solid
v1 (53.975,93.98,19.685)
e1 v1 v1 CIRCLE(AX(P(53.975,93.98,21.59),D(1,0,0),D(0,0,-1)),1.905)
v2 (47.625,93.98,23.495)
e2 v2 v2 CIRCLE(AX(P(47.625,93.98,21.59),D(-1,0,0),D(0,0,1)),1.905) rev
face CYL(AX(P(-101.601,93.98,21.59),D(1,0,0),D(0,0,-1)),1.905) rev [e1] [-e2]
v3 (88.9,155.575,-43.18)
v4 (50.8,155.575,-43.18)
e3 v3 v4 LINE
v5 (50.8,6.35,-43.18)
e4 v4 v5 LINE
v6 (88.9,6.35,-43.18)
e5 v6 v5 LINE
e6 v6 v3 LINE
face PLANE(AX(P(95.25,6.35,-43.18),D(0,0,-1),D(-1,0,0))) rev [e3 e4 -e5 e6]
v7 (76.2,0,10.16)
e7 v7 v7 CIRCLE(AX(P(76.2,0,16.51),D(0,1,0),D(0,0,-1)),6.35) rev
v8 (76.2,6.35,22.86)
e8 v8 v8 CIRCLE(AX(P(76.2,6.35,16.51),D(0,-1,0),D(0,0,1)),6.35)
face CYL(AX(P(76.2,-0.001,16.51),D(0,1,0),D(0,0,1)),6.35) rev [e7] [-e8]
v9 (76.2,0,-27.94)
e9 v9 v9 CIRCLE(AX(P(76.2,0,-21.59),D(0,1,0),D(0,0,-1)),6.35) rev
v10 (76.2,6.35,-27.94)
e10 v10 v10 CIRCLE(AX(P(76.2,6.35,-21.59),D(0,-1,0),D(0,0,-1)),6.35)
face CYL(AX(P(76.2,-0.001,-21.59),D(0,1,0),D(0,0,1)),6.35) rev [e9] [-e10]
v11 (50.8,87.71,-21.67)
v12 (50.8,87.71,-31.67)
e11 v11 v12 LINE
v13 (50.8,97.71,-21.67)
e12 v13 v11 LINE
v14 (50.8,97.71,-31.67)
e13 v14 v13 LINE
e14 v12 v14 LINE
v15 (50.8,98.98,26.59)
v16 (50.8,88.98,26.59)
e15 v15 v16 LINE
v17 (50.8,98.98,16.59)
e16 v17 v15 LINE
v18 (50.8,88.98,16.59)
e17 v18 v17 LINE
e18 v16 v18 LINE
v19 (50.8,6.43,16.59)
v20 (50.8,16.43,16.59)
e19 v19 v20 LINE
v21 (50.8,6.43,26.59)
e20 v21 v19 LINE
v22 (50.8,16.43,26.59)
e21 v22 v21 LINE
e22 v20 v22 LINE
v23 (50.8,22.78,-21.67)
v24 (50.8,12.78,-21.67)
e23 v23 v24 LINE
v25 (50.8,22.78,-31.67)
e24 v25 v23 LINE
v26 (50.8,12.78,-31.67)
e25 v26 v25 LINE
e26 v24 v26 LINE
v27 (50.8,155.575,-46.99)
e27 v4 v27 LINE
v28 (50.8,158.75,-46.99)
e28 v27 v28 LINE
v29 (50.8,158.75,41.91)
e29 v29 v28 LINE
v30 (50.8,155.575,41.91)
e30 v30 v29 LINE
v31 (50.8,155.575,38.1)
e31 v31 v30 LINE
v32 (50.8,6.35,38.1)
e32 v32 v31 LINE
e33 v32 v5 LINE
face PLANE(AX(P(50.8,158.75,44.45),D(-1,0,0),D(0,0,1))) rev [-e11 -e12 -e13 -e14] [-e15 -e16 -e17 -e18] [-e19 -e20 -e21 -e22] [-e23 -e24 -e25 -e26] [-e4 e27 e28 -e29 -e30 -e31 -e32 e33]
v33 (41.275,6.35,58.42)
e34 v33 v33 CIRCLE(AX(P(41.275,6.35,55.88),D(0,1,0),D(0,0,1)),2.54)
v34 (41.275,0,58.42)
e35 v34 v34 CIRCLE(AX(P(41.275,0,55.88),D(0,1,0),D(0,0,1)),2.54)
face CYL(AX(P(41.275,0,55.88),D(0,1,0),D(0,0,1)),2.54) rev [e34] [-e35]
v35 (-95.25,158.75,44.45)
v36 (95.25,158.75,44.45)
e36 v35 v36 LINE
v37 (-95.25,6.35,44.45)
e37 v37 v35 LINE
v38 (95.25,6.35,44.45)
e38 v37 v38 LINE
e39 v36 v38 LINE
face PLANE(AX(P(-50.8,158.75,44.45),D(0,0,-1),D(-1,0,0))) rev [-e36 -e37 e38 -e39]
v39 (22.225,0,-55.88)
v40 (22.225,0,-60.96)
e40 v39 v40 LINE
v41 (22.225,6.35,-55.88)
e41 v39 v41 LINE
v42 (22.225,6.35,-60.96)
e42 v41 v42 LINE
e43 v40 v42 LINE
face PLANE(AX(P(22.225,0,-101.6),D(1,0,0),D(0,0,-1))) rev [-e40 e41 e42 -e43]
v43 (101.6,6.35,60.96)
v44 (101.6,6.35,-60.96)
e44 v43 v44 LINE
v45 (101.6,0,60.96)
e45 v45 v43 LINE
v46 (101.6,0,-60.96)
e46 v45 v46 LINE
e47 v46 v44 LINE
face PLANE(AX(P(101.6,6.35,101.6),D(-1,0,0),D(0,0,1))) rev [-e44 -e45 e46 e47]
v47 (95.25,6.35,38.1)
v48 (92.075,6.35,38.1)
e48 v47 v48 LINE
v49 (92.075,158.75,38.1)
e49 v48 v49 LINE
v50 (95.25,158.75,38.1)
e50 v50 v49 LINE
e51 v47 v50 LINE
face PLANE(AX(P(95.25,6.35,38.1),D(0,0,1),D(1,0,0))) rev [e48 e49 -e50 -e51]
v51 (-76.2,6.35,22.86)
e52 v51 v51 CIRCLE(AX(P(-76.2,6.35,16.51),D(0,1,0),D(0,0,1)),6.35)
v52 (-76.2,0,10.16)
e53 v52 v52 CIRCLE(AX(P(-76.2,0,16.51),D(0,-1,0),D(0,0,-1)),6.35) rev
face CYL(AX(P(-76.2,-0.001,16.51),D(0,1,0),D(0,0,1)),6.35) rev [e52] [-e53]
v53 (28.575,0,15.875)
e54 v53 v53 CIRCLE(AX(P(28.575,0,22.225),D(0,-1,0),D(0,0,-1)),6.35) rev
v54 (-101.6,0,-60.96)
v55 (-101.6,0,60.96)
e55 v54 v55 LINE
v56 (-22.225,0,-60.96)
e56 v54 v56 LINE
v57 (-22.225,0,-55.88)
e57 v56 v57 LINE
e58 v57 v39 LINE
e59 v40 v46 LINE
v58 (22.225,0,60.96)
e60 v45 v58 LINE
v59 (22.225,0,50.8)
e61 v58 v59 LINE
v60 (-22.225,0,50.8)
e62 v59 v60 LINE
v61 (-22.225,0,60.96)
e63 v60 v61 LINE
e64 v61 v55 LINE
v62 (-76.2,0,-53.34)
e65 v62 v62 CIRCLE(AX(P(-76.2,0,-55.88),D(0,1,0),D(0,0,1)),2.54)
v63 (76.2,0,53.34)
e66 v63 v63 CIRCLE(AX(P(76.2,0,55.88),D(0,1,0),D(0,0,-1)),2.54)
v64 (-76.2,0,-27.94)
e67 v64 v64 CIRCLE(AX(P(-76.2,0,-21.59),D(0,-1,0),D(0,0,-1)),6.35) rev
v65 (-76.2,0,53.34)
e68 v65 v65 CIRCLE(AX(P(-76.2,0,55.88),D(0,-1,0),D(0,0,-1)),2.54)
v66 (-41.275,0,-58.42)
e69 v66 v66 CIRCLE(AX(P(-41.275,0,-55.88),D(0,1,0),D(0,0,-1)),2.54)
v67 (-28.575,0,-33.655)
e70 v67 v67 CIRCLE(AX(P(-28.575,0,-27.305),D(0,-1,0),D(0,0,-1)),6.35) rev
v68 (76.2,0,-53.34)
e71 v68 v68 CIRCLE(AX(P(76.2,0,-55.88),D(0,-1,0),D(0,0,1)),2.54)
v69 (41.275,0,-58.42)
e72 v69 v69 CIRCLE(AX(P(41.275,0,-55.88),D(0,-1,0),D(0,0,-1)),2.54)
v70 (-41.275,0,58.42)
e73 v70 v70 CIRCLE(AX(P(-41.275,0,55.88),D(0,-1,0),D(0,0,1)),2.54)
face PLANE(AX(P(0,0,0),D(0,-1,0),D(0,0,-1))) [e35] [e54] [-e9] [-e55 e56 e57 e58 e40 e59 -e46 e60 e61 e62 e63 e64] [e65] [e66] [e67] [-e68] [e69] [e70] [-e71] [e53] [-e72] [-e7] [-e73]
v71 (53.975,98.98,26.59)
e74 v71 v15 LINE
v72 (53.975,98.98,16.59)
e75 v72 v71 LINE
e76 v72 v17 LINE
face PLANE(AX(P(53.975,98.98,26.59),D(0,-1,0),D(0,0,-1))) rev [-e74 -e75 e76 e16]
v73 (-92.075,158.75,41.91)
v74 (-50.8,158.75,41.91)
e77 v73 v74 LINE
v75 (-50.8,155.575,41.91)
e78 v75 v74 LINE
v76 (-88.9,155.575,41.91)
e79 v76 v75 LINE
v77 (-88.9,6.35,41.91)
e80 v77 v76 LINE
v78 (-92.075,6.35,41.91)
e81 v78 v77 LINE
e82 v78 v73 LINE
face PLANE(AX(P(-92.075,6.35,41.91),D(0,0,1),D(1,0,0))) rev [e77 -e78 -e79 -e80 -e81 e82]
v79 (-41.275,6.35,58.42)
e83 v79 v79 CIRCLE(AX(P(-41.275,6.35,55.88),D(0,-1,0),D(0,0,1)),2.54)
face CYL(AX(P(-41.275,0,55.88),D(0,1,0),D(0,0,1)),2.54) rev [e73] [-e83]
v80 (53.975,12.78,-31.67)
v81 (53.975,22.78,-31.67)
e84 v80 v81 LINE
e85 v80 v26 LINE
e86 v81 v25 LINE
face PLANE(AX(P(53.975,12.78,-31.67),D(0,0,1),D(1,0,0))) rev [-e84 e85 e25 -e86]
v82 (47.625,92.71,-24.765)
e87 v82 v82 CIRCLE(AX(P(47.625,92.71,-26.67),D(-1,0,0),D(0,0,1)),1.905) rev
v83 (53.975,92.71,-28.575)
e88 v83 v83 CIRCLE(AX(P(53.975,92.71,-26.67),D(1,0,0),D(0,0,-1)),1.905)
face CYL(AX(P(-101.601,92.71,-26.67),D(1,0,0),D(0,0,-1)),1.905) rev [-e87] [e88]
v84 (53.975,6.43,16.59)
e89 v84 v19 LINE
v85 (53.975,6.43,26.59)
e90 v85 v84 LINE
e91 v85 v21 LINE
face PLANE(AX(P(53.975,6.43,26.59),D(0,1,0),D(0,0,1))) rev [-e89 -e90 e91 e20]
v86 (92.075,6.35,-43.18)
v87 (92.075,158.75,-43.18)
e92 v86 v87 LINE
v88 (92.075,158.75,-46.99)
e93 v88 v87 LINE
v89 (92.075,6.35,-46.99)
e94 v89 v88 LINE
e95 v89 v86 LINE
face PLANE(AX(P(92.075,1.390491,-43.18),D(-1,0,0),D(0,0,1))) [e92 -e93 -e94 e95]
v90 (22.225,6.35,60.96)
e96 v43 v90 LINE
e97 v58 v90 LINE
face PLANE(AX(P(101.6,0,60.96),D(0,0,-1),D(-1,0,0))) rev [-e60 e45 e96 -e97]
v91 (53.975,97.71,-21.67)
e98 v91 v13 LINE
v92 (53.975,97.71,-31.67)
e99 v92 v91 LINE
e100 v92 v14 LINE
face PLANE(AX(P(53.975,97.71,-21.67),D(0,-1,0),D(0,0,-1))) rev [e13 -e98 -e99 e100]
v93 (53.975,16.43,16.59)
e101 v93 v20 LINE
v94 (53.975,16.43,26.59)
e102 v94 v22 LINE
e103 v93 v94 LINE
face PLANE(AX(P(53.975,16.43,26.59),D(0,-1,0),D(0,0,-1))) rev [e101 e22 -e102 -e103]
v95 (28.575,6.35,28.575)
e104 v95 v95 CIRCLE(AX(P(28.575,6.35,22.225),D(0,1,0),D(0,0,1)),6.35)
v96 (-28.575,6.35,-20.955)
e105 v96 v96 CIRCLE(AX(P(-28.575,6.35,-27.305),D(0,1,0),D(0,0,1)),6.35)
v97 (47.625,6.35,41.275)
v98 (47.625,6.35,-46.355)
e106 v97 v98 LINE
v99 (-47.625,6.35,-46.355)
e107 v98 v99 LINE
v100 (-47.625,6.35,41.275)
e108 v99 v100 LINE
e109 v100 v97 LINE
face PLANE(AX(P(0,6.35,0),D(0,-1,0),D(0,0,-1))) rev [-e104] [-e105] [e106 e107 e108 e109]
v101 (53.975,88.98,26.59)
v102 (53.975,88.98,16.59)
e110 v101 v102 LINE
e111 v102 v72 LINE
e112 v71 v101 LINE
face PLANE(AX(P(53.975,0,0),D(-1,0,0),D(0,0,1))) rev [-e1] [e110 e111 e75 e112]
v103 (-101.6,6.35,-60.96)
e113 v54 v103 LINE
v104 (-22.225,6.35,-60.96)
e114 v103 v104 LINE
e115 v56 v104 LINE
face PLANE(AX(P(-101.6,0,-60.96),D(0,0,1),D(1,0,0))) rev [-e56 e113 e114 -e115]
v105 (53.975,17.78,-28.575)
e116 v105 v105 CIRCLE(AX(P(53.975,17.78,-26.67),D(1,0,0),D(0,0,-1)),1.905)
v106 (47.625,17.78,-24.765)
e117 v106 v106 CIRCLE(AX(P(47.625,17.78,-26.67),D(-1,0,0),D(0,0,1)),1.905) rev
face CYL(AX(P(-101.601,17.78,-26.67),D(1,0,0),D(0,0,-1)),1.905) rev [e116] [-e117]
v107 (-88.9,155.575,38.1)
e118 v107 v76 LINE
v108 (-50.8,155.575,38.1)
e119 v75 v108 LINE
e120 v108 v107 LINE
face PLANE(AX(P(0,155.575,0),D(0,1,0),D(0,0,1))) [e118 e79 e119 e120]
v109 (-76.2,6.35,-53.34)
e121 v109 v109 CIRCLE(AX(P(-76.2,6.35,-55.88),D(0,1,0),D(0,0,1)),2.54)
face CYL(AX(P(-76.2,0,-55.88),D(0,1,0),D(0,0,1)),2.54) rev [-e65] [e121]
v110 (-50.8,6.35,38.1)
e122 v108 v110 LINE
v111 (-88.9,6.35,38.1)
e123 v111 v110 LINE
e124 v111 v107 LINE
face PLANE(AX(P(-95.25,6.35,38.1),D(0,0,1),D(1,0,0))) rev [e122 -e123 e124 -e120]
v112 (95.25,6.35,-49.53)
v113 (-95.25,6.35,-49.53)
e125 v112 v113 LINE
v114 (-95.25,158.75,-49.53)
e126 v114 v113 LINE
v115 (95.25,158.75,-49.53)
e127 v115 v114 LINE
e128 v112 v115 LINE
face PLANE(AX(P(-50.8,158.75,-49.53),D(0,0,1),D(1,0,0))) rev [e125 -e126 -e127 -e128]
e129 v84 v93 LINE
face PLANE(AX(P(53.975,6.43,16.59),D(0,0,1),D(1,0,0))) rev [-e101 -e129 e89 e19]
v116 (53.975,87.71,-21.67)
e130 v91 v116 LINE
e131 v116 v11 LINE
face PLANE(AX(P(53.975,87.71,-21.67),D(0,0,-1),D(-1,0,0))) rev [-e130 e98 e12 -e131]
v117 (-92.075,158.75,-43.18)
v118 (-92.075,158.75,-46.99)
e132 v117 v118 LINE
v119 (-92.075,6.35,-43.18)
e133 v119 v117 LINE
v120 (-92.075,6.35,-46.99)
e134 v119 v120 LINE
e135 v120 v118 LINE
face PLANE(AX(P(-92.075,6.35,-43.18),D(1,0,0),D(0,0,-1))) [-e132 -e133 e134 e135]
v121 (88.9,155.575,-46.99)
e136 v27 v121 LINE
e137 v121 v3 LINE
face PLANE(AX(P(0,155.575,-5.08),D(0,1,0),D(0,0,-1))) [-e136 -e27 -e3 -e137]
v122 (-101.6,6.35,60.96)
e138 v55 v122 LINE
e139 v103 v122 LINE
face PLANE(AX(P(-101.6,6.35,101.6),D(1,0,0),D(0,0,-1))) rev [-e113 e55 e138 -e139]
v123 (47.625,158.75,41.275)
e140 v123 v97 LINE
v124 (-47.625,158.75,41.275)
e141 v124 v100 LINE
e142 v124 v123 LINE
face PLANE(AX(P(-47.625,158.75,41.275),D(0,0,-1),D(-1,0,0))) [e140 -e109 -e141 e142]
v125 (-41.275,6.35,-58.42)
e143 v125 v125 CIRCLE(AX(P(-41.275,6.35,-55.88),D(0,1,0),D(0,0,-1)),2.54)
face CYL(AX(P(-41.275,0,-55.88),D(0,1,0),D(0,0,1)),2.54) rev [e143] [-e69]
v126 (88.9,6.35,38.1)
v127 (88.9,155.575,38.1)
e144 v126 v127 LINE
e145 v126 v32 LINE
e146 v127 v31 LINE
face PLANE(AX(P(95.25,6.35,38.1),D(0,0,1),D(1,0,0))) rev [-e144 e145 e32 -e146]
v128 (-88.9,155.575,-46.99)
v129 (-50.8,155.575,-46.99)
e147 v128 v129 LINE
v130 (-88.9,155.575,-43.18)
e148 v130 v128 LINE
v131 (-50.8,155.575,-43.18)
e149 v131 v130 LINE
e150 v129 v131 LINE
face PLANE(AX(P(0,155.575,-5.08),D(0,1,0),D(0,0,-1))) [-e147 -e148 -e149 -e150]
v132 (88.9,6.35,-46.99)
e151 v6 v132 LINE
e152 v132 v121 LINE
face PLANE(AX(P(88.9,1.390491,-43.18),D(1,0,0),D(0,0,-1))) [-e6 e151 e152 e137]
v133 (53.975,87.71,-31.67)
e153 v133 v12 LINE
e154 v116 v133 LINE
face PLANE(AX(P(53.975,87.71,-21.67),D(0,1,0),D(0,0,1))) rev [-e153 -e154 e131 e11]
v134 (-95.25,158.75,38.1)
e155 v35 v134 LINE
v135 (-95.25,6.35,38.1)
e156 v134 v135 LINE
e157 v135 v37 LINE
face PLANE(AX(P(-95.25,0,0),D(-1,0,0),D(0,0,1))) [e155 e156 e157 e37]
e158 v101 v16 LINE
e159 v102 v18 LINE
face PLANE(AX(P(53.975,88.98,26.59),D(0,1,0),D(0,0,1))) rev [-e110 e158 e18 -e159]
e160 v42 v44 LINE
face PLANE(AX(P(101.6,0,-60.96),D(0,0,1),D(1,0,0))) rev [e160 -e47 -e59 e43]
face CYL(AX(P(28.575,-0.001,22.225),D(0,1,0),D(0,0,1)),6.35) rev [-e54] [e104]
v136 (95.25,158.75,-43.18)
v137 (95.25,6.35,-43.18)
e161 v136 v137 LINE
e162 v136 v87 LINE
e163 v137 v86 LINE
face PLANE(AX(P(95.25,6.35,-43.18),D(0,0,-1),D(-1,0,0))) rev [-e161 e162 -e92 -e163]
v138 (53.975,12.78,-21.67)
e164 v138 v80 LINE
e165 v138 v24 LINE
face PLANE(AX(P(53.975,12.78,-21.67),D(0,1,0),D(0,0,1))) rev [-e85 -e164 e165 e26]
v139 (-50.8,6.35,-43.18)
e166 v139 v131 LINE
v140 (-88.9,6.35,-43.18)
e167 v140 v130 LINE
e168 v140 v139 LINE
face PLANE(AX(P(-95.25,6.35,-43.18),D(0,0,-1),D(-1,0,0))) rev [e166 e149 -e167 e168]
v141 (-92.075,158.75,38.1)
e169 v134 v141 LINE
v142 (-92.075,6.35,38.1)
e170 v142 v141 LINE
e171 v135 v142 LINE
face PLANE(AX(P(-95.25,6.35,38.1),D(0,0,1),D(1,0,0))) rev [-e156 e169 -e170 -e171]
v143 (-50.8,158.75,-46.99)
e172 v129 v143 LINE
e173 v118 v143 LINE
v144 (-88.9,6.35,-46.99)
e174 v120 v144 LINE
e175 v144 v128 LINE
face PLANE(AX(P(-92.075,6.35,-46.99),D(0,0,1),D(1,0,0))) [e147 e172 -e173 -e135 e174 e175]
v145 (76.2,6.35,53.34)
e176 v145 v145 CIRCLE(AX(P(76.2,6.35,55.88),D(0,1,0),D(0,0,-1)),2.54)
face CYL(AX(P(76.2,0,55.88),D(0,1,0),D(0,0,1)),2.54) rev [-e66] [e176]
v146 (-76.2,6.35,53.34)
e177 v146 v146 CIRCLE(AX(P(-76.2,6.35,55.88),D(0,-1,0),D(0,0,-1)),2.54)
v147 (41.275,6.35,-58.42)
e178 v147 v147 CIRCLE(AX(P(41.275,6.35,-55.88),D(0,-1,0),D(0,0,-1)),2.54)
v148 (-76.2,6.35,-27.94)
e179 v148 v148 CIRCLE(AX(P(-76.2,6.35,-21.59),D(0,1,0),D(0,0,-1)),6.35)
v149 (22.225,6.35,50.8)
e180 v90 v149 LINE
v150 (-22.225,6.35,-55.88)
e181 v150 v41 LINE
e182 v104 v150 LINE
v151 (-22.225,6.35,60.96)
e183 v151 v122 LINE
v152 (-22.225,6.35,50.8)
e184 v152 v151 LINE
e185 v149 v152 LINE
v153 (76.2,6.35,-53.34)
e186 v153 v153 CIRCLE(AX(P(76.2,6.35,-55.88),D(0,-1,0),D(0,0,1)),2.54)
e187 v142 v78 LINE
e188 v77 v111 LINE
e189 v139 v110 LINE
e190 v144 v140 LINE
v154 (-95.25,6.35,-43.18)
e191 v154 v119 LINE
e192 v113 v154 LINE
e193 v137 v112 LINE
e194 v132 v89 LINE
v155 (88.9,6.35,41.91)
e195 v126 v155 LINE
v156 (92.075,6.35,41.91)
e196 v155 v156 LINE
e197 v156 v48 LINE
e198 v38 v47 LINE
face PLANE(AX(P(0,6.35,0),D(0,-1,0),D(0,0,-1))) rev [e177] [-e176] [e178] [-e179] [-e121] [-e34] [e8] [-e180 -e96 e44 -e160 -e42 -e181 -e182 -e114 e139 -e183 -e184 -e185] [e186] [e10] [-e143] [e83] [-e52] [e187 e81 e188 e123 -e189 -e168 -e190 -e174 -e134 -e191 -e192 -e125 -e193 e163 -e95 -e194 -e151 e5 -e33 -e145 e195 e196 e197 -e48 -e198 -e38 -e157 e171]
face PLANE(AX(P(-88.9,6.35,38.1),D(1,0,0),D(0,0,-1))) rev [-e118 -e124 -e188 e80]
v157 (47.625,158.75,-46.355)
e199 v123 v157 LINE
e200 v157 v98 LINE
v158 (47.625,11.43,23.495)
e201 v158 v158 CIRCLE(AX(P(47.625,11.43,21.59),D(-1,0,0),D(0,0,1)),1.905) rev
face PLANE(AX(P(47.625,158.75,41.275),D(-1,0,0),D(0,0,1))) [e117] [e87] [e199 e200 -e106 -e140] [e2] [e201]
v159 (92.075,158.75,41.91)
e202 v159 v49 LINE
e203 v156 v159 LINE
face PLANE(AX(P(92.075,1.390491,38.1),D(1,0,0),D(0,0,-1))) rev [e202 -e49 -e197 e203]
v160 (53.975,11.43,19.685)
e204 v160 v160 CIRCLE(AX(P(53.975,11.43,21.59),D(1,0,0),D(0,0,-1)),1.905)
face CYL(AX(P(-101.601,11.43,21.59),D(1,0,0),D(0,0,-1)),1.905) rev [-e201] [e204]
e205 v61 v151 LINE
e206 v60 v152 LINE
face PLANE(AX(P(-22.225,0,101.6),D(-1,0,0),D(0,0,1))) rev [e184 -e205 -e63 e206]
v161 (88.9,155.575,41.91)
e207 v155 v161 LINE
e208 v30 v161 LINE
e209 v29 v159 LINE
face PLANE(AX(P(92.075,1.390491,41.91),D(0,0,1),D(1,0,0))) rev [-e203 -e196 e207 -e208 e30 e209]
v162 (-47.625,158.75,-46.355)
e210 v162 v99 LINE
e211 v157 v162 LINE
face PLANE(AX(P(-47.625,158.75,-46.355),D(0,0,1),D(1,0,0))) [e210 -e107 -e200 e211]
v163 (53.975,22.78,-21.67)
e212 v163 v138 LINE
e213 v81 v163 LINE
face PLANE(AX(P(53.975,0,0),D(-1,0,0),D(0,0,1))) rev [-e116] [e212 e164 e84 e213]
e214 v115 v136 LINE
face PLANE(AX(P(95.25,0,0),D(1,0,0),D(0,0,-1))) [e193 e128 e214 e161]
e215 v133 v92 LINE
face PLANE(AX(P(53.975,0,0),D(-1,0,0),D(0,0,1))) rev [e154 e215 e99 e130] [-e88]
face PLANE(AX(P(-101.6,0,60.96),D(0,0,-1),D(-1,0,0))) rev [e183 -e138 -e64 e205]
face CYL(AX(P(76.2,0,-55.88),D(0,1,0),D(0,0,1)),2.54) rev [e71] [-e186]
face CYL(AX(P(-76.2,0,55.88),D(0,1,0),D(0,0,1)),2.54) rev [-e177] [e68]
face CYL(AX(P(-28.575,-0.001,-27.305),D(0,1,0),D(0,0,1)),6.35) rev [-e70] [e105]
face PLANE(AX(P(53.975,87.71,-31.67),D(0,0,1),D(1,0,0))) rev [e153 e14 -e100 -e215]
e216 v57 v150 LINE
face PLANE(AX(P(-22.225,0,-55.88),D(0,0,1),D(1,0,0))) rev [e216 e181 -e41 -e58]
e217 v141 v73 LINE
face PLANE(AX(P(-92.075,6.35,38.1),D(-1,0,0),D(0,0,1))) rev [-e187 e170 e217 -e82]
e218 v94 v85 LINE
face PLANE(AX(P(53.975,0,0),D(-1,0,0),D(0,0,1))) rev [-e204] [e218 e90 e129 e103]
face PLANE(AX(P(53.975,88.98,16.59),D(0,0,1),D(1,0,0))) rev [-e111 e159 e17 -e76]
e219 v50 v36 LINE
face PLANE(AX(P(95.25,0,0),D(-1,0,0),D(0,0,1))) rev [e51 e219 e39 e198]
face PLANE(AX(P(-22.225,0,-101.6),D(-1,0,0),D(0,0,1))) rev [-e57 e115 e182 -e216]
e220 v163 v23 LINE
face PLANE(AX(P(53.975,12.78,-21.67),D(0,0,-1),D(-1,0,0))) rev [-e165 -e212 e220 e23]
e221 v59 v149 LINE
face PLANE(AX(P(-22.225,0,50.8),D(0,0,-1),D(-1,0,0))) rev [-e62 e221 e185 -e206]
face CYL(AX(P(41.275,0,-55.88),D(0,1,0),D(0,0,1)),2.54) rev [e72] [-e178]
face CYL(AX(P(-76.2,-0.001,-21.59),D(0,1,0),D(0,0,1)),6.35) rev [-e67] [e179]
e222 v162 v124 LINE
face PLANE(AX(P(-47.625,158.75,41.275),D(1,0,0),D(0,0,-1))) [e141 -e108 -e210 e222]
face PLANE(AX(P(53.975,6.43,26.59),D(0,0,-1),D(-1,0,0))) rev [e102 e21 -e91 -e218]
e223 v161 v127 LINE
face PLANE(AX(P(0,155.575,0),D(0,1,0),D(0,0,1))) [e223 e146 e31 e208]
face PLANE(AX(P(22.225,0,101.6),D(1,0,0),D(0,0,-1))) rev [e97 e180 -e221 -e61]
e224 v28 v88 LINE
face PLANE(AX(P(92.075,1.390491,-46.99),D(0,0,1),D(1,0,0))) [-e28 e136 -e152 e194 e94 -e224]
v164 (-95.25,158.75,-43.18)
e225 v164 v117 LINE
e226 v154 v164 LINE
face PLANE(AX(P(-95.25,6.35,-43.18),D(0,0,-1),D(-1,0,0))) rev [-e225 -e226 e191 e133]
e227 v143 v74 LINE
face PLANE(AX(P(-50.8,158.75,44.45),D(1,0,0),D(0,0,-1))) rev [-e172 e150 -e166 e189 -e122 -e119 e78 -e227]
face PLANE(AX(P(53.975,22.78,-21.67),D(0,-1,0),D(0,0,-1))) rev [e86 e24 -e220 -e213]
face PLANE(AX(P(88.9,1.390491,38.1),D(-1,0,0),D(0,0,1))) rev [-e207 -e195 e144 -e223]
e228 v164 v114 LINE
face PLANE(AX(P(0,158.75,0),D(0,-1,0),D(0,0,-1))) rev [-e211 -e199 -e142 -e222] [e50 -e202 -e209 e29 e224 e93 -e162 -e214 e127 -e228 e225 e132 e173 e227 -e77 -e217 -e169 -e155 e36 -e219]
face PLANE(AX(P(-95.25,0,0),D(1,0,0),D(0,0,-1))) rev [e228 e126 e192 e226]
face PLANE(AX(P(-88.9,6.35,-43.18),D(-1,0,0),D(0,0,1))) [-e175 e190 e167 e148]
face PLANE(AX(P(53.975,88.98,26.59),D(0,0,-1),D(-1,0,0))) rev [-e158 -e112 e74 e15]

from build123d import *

# Parameters (mm, degrees)
SKETCH1_W               = 203.2
SKETCH1_H               = 203.2
BOSS_EXTRUDE1_DEPTH     = 6.35
SKETCH2_W               = 44.45
SKETCH2_H               = 45.72
SKETCH2_H_2             = 50.8
CUT_EXTRUDE1_DEPTH      = 144.824345992
SKETCH3_R               = 2.54
SKETCH3_W               = 25.4
SKETCH3_H               = 25.4
CUT_EXTRUDE2_DEPTH      = 6.35
MIRROR2_COPY_1_SKETCH_R = 2.54
MIRROR2_COPY_1_SKETCH_W = 25.4
MIRROR2_COPY_1_SKETCH_H = 25.4
MIRROR2_COPY_1_DEPTH    = 6.35
SKETCH4_W               = 101.6
SKETCH4_H               = 93.98
SKETCH4_W_2             = 95.25
SKETCH4_H_2             = 87.63
BOSS_EXTRUDE2_DEPTH     = 152.4
SKETCH5_W               = 10
SKETCH5_H               = 10
SKETCH5_R               = 1.6
BOSS_EXTRUDE3_DEPTH     = 3.175
CUT_EXTRUDE3_REACH      = 246.393
SKETCH8_R               = 1.905
SKETCH9_W               = 6.35
SKETCH9_H               = 152.4
BOSS_EXTRUDE4_DEPTH     = 44.45
SKETCH12_W              = 3.175
SKETCH12_H              = 3.81
CUT_EXTRUDE4_DEPTH      = 152.4
SKETCH13_W              = 38.1
SKETCH13_H              = 3.81
CUT_EXTRUDE5_DEPTH      = 3.175
SKETCH14_W              = 6.35
SKETCH14_H              = 152.4
BOSS_EXTRUDE5_DEPTH     = 44.45
SKETCH15_W              = 3.175
SKETCH15_H              = 3.81
CUT_EXTRUDE6_DEPTH      = 152.4
SKETCH16_W              = 38.1
SKETCH16_H              = 3.81
CUT_EXTRUDE7_DEPTH      = 3.175
CUT_EXTRUDE8_REACH      = 211.454
SKETCH17_R              = 6.35
MIRROR5_OUTLINE_R       = 6.35
MIRROR5_DEPTH           = 6.35
SKETCH18_W              = 79.375
SKETCH18_H              = 40.64
CUT_EXTRUDE9_DEPTH      = 210.453765781


# Read off the part's stored shape, not the designer's step: Mirror5
with BuildPart() as part:
    # Sketch1 → Boss-Extrude1 (new body)
    with BuildSketch(Plane(origin=(0, 0, 0), x_dir=(1, 0, 0), z_dir=(0, 1, 0))):
        Rectangle(SKETCH1_W, SKETCH1_H)
    extrude(amount=BOSS_EXTRUDE1_DEPTH)

    # Sketch2 → Cut-Extrude1 (cut, through all)
    with BuildSketch(Plane(origin=(0, 6.35, 0), x_dir=(1, 0, 0), z_dir=(0, 1, 0))):
        with Locations((0, 78.74)):
            Rectangle(SKETCH2_W, SKETCH2_H)
        with Locations((0, -76.2)):
            Rectangle(SKETCH2_W, SKETCH2_H_2)
    extrude(amount=-CUT_EXTRUDE1_DEPTH, mode=Mode.SUBTRACT)

    # Sketch3 → Cut-Extrude2 (cut)
    with BuildSketch(Plane(origin=(0, 6.35, 0), x_dir=(1, 0, 0), z_dir=(0, 1, 0))):
        with Locations(Location((-96.52, 76.2, 0), (0, 0, 270))):
            Circle(SKETCH3_R)
        with Locations(Location((-76.2, 96.52, 0), (0, 0, 270))):
            Circle(SKETCH3_R)
        with Locations(Location((-76.2, 55.88, 0), (0, 0, 270))):
            Circle(SKETCH3_R)
        with Locations(Location((-41.275, 96.52, 0), (0, 0, 270))):
            Circle(SKETCH3_R)
        with Locations(Location((-41.275, 55.88, 0), (0, 0, 90))):
            Circle(SKETCH3_R)
        with Locations((-41.148, 76.2)):
            Rectangle(SKETCH3_W, SKETCH3_H)
        with Locations((-76.2, 76.2)):
            Rectangle(SKETCH3_W, SKETCH3_H)
    cut_extrude2 = extrude(amount=-CUT_EXTRUDE2_DEPTH, mode=Mode.SUBTRACT)

    # Mirror1: Cut-Extrude2 across plane
    add(cut_extrude2.mirror(Plane(origin=(0, 0, 0), x_dir=(0, 0, 1), z_dir=(1, 0, 0))), mode=Mode.SUBTRACT)

    # Mirror2: Cut-Extrude2 across plane
    add(cut_extrude2.mirror(Plane.XY), mode=Mode.SUBTRACT)

    # Mirror2 copy 1 sketch → Mirror2 copy 1 (cut)
    with BuildSketch(Plane(origin=(0, 6.35, 0), x_dir=(-1, 0, 0), z_dir=(0, 1, 0))):
        with Locations(Location((-96.52, 76.2, 0), (0, 0, 270))):
            Circle(MIRROR2_COPY_1_SKETCH_R)
        with Locations(Location((-76.2, 96.52, 0), (0, 0, 270))):
            Circle(MIRROR2_COPY_1_SKETCH_R)
        with Locations(Location((-76.2, 55.88, 0), (0, 0, 270))):
            Circle(MIRROR2_COPY_1_SKETCH_R)
        with Locations(Location((-41.275, 96.52, 0), (0, 0, 270))):
            Circle(MIRROR2_COPY_1_SKETCH_R)
        with Locations(Location((-41.275, 55.88, 0), (0, 0, 90))):
            Circle(MIRROR2_COPY_1_SKETCH_R)
        with Locations((-41.148, 76.2)):
            Rectangle(MIRROR2_COPY_1_SKETCH_W, MIRROR2_COPY_1_SKETCH_H)
        with Locations((-76.2, 76.2)):
            Rectangle(MIRROR2_COPY_1_SKETCH_W, MIRROR2_COPY_1_SKETCH_H)
    extrude(amount=-MIRROR2_COPY_1_DEPTH, mode=Mode.SUBTRACT)

    # Sketch4 → Boss-Extrude2 (add)
    with BuildSketch(Plane(origin=(0, 6.35, 0), x_dir=(1, 0, 0), z_dir=(0, 1, 0))):
        with Locations((0, 2.54)):
            Rectangle(SKETCH4_W, SKETCH4_H)
        with Locations((0, 2.54)):
            Rectangle(SKETCH4_W_2, SKETCH4_H_2, mode=Mode.SUBTRACT)
    extrude(amount=BOSS_EXTRUDE2_DEPTH)

    # Sketch5 → Boss-Extrude3 (add)
    # profile 1 of 4: a face of its own
    with BuildSketch(Plane(origin=(50.8, 0, 0), x_dir=(0, 0, -1), z_dir=(1, 0, 0))):
        with Locations((-21.59, 93.98)):
            Rectangle(SKETCH5_W, SKETCH5_H)
        with Locations((-21.59, 93.98)):
            Circle(SKETCH5_R, mode=Mode.SUBTRACT)
    # profile 2 of 4: a face of its own
    with BuildSketch(Plane(origin=(50.8, 0, 0), x_dir=(0, 0, -1), z_dir=(1, 0, 0))):
        with Locations((26.67, 92.71)):
            Rectangle(SKETCH5_W, SKETCH5_H)
        with Locations((26.67, 92.71)):
            Circle(SKETCH5_R, mode=Mode.SUBTRACT)
    # profile 3 of 4: a face of its own
    with BuildSketch(Plane(origin=(50.8, 0, 0), x_dir=(0, 0, -1), z_dir=(1, 0, 0))):
        with Locations((-21.59, 11.43)):
            Rectangle(SKETCH5_W, SKETCH5_H)
        with Locations((-21.59, 11.43)):
            Circle(SKETCH5_R, mode=Mode.SUBTRACT)
    # profile 4 of 4: a face of its own
    with BuildSketch(Plane(origin=(50.8, 0, 0), x_dir=(0, 0, -1), z_dir=(1, 0, 0))):
        with Locations((26.67, 17.78)):
            Rectangle(SKETCH5_W, SKETCH5_H)
        with Locations((26.67, 17.78)):
            Circle(SKETCH5_R, mode=Mode.SUBTRACT)
    extrude(amount=BOSS_EXTRUDE3_DEPTH)

    # Sketch8 → Cut-Extrude3 (cut, up to next)
    with BuildSketch(Plane(origin=(53.975, 0, 0), x_dir=(0, 0, -1), z_dir=(1, 0, 0)), mode=Mode.PRIVATE) as cut_extrude3_sk1:
        with Locations((-21.59, 93.98)):
            Circle(SKETCH8_R)
    cut_extrude3_tool1 = extrude(cut_extrude3_sk1.sketch, amount=-CUT_EXTRUDE3_REACH, mode=Mode.PRIVATE) & part.part
    # Sketch8 → Cut-Extrude3 (cut, up to next)
    with BuildSketch(Plane(origin=(53.975, 0, 0), x_dir=(0, 0, -1), z_dir=(1, 0, 0)), mode=Mode.PRIVATE) as cut_extrude3_sk2:
        with Locations((26.67, 92.71)):
            Circle(SKETCH8_R)
    cut_extrude3_tool2 = extrude(cut_extrude3_sk2.sketch, amount=-CUT_EXTRUDE3_REACH, mode=Mode.PRIVATE) & part.part
    # Sketch8 → Cut-Extrude3 (cut, up to next)
    with BuildSketch(Plane(origin=(53.975, 0, 0), x_dir=(0, 0, -1), z_dir=(1, 0, 0)), mode=Mode.PRIVATE) as cut_extrude3_sk3:
        with Locations((-21.59, 11.43)):
            Circle(SKETCH8_R)
    cut_extrude3_tool3 = extrude(cut_extrude3_sk3.sketch, amount=-CUT_EXTRUDE3_REACH, mode=Mode.PRIVATE) & part.part
    # Sketch8 → Cut-Extrude3 (cut, up to next)
    with BuildSketch(Plane(origin=(53.975, 0, 0), x_dir=(0, 0, -1), z_dir=(1, 0, 0)), mode=Mode.PRIVATE) as cut_extrude3_sk4:
        with Locations((26.67, 17.78)):
            Circle(SKETCH8_R)
    cut_extrude3_tool4 = extrude(cut_extrude3_sk4.sketch, amount=-CUT_EXTRUDE3_REACH, mode=Mode.PRIVATE) & part.part
    add(cut_extrude3_tool1.solids().sort_by_distance((53.975, 93.98, 21.59))[0], mode=Mode.SUBTRACT)
    add(cut_extrude3_tool2.solids().sort_by_distance((53.975, 92.71, -26.67))[0], mode=Mode.SUBTRACT)
    add(cut_extrude3_tool3.solids().sort_by_distance((53.975, 11.43, 21.59))[0], mode=Mode.SUBTRACT)
    add(cut_extrude3_tool4.solids().sort_by_distance((53.975, 17.78, -26.67))[0], mode=Mode.SUBTRACT)

    # Sketch9 → Boss-Extrude4 (add)
    with BuildSketch(Plane(origin=(50.8, 0, 0), x_dir=(0, 0, -1), z_dir=(1, 0, 0))):
        with Locations((-41.275, 82.55)):
            Rectangle(SKETCH9_W, SKETCH9_H)
        with Locations((46.355, 82.55)):
            Rectangle(SKETCH9_W, SKETCH9_H)
    extrude(amount=BOSS_EXTRUDE4_DEPTH)

    # Sketch12 → Cut-Extrude4 (cut)
    with BuildSketch(Plane(origin=(0, 158.75, 0), x_dir=(1, 0, 0), z_dir=(0, 1, 0))):
        with Locations((90.4875, -40.005)):
            Rectangle(SKETCH12_W, SKETCH12_H)
    cut_extrude4 = extrude(amount=-CUT_EXTRUDE4_DEPTH, mode=Mode.SUBTRACT)

    # Sketch13 → Cut-Extrude5 (cut)
    with BuildSketch(Plane(origin=(0, 158.75, 0), x_dir=(1, 0, 0), z_dir=(0, 1, 0))):
        with Locations((69.85, -40.005)):
            Rectangle(SKETCH13_W, SKETCH13_H)
    cut_extrude5 = extrude(amount=-CUT_EXTRUDE5_DEPTH, mode=Mode.SUBTRACT)

    # Mirror3: Cut-Extrude4, Cut-Extrude5 across plane
    add(cut_extrude4.mirror(Plane(origin=(0, 0, -2.54), x_dir=(1, 0, 0), z_dir=(0, 0, -1))), mode=Mode.SUBTRACT)
    add(cut_extrude5.mirror(Plane(origin=(0, 0, -2.54), x_dir=(1, 0, 0), z_dir=(0, 0, -1))), mode=Mode.SUBTRACT)

    # Sketch14 → Boss-Extrude5 (add)
    with BuildSketch(Plane.ZY.offset(50.8)):
        with Locations((-46.355, 82.55)):
            Rectangle(SKETCH14_W, SKETCH14_H)
        with Locations((41.275, 82.55)):
            Rectangle(SKETCH14_W, SKETCH14_H)
    extrude(amount=BOSS_EXTRUDE5_DEPTH)

    # Sketch15 → Cut-Extrude6 (cut)
    with BuildSketch(Plane(origin=(0, 158.75, 0), x_dir=(1, 0, 0), z_dir=(0, 1, 0))):
        with Locations((-90.4875, -40.005)):
            Rectangle(SKETCH15_W, SKETCH15_H)
    cut_extrude6 = extrude(amount=-CUT_EXTRUDE6_DEPTH, mode=Mode.SUBTRACT)

    # Sketch16 → Cut-Extrude7 (cut)
    with BuildSketch(Plane(origin=(0, 158.75, 0), x_dir=(1, 0, 0), z_dir=(0, 1, 0))):
        with Locations((-69.85, -40.005)):
            Rectangle(SKETCH16_W, SKETCH16_H)
    cut_extrude7 = extrude(amount=-CUT_EXTRUDE7_DEPTH, mode=Mode.SUBTRACT)

    # Mirror4: Cut-Extrude6, Cut-Extrude7 across plane
    add(cut_extrude6.mirror(Plane(origin=(0, 0, -2.54), x_dir=(1, 0, 0), z_dir=(0, 0, -1))), mode=Mode.SUBTRACT)
    add(cut_extrude7.mirror(Plane(origin=(0, 0, -2.54), x_dir=(1, 0, 0), z_dir=(0, 0, -1))), mode=Mode.SUBTRACT)

    # Sketch17 → Cut-Extrude8 (cut, up to next)
    with BuildSketch(Plane(origin=(0, 6.35, 0), x_dir=(1, 0, 0), z_dir=(0, 1, 0)), mode=Mode.PRIVATE) as cut_extrude8_sk1:
        with Locations(Location((-76.2, -16.51, 0), (0, 0, 270))):
            Circle(SKETCH17_R)
    cut_extrude8_tool1 = extrude(cut_extrude8_sk1.sketch, amount=-CUT_EXTRUDE8_REACH, mode=Mode.PRIVATE) & part.part
    # Sketch17 → Cut-Extrude8 (cut, up to next)
    with BuildSketch(Plane(origin=(0, 6.35, 0), x_dir=(1, 0, 0), z_dir=(0, 1, 0)), mode=Mode.PRIVATE) as cut_extrude8_sk2:
        with Locations(Location((-76.2, 21.59, 0), (0, 0, 90))):
            Circle(SKETCH17_R)
    cut_extrude8_tool2 = extrude(cut_extrude8_sk2.sketch, amount=-CUT_EXTRUDE8_REACH, mode=Mode.PRIVATE) & part.part
    # Sketch17 → Cut-Extrude8 (cut, up to next)
    with BuildSketch(Plane(origin=(0, 6.35, 0), x_dir=(1, 0, 0), z_dir=(0, 1, 0)), mode=Mode.PRIVATE) as cut_extrude8_sk3:
        with Locations(Location((-28.575, 27.305, 0), (0, 0, 270))):
            Circle(SKETCH17_R)
    cut_extrude8_tool3 = extrude(cut_extrude8_sk3.sketch, amount=-CUT_EXTRUDE8_REACH, mode=Mode.PRIVATE) & part.part
    # Sketch17 → Cut-Extrude8 (cut, up to next)
    with BuildSketch(Plane(origin=(0, 6.35, 0), x_dir=(1, 0, 0), z_dir=(0, 1, 0)), mode=Mode.PRIVATE) as cut_extrude8_sk4:
        with Locations(Location((28.575, -22.225, 0), (0, 0, 270))):
            Circle(SKETCH17_R)
    cut_extrude8_tool4 = extrude(cut_extrude8_sk4.sketch, amount=-CUT_EXTRUDE8_REACH, mode=Mode.PRIVATE) & part.part
    add(cut_extrude8_tool1.solids().sort_by_distance((-76.2, 6.35, 16.51))[0], mode=Mode.SUBTRACT)
    add(cut_extrude8_tool2.solids().sort_by_distance((-76.2, 6.35, -21.59))[0], mode=Mode.SUBTRACT)
    add(cut_extrude8_tool3.solids().sort_by_distance((-28.575, 6.35, -27.305))[0], mode=Mode.SUBTRACT)
    add(cut_extrude8_tool4.solids().sort_by_distance((28.575, 6.35, 22.225))[0], mode=Mode.SUBTRACT)

    # Mirror5 outline → Mirror5 (cut)
    with BuildSketch(Plane(origin=(0, 0, 0), x_dir=(1, 0, 0), z_dir=(0, 1, 0))):
        with Locations((76.2, 21.59)):
            Circle(MIRROR5_OUTLINE_R)
        with Locations((76.2, -16.51)):
            Circle(MIRROR5_OUTLINE_R)
    extrude(amount=MIRROR5_DEPTH, mode=Mode.SUBTRACT)

    # Sketch18 → Cut-Extrude9 (cut, through all)
    with BuildSketch(Plane(origin=(0, 6.35, 0), x_dir=(1, 0, 0), z_dir=(0, 1, 0))):
        with Locations((-61.9125, 81.28)):
            Rectangle(SKETCH18_W, SKETCH18_H)
        with Locations((61.9125, 81.28)):
            Rectangle(SKETCH18_W, SKETCH18_H)
        with Locations((-61.9125, -81.28)):
            Rectangle(SKETCH18_W, SKETCH18_H)
        with Locations((61.9125, -81.28)):
            Rectangle(SKETCH18_W, SKETCH18_H)
    extrude(amount=-CUT_EXTRUDE9_DEPTH, mode=Mode.SUBTRACT)


solid = part.part
